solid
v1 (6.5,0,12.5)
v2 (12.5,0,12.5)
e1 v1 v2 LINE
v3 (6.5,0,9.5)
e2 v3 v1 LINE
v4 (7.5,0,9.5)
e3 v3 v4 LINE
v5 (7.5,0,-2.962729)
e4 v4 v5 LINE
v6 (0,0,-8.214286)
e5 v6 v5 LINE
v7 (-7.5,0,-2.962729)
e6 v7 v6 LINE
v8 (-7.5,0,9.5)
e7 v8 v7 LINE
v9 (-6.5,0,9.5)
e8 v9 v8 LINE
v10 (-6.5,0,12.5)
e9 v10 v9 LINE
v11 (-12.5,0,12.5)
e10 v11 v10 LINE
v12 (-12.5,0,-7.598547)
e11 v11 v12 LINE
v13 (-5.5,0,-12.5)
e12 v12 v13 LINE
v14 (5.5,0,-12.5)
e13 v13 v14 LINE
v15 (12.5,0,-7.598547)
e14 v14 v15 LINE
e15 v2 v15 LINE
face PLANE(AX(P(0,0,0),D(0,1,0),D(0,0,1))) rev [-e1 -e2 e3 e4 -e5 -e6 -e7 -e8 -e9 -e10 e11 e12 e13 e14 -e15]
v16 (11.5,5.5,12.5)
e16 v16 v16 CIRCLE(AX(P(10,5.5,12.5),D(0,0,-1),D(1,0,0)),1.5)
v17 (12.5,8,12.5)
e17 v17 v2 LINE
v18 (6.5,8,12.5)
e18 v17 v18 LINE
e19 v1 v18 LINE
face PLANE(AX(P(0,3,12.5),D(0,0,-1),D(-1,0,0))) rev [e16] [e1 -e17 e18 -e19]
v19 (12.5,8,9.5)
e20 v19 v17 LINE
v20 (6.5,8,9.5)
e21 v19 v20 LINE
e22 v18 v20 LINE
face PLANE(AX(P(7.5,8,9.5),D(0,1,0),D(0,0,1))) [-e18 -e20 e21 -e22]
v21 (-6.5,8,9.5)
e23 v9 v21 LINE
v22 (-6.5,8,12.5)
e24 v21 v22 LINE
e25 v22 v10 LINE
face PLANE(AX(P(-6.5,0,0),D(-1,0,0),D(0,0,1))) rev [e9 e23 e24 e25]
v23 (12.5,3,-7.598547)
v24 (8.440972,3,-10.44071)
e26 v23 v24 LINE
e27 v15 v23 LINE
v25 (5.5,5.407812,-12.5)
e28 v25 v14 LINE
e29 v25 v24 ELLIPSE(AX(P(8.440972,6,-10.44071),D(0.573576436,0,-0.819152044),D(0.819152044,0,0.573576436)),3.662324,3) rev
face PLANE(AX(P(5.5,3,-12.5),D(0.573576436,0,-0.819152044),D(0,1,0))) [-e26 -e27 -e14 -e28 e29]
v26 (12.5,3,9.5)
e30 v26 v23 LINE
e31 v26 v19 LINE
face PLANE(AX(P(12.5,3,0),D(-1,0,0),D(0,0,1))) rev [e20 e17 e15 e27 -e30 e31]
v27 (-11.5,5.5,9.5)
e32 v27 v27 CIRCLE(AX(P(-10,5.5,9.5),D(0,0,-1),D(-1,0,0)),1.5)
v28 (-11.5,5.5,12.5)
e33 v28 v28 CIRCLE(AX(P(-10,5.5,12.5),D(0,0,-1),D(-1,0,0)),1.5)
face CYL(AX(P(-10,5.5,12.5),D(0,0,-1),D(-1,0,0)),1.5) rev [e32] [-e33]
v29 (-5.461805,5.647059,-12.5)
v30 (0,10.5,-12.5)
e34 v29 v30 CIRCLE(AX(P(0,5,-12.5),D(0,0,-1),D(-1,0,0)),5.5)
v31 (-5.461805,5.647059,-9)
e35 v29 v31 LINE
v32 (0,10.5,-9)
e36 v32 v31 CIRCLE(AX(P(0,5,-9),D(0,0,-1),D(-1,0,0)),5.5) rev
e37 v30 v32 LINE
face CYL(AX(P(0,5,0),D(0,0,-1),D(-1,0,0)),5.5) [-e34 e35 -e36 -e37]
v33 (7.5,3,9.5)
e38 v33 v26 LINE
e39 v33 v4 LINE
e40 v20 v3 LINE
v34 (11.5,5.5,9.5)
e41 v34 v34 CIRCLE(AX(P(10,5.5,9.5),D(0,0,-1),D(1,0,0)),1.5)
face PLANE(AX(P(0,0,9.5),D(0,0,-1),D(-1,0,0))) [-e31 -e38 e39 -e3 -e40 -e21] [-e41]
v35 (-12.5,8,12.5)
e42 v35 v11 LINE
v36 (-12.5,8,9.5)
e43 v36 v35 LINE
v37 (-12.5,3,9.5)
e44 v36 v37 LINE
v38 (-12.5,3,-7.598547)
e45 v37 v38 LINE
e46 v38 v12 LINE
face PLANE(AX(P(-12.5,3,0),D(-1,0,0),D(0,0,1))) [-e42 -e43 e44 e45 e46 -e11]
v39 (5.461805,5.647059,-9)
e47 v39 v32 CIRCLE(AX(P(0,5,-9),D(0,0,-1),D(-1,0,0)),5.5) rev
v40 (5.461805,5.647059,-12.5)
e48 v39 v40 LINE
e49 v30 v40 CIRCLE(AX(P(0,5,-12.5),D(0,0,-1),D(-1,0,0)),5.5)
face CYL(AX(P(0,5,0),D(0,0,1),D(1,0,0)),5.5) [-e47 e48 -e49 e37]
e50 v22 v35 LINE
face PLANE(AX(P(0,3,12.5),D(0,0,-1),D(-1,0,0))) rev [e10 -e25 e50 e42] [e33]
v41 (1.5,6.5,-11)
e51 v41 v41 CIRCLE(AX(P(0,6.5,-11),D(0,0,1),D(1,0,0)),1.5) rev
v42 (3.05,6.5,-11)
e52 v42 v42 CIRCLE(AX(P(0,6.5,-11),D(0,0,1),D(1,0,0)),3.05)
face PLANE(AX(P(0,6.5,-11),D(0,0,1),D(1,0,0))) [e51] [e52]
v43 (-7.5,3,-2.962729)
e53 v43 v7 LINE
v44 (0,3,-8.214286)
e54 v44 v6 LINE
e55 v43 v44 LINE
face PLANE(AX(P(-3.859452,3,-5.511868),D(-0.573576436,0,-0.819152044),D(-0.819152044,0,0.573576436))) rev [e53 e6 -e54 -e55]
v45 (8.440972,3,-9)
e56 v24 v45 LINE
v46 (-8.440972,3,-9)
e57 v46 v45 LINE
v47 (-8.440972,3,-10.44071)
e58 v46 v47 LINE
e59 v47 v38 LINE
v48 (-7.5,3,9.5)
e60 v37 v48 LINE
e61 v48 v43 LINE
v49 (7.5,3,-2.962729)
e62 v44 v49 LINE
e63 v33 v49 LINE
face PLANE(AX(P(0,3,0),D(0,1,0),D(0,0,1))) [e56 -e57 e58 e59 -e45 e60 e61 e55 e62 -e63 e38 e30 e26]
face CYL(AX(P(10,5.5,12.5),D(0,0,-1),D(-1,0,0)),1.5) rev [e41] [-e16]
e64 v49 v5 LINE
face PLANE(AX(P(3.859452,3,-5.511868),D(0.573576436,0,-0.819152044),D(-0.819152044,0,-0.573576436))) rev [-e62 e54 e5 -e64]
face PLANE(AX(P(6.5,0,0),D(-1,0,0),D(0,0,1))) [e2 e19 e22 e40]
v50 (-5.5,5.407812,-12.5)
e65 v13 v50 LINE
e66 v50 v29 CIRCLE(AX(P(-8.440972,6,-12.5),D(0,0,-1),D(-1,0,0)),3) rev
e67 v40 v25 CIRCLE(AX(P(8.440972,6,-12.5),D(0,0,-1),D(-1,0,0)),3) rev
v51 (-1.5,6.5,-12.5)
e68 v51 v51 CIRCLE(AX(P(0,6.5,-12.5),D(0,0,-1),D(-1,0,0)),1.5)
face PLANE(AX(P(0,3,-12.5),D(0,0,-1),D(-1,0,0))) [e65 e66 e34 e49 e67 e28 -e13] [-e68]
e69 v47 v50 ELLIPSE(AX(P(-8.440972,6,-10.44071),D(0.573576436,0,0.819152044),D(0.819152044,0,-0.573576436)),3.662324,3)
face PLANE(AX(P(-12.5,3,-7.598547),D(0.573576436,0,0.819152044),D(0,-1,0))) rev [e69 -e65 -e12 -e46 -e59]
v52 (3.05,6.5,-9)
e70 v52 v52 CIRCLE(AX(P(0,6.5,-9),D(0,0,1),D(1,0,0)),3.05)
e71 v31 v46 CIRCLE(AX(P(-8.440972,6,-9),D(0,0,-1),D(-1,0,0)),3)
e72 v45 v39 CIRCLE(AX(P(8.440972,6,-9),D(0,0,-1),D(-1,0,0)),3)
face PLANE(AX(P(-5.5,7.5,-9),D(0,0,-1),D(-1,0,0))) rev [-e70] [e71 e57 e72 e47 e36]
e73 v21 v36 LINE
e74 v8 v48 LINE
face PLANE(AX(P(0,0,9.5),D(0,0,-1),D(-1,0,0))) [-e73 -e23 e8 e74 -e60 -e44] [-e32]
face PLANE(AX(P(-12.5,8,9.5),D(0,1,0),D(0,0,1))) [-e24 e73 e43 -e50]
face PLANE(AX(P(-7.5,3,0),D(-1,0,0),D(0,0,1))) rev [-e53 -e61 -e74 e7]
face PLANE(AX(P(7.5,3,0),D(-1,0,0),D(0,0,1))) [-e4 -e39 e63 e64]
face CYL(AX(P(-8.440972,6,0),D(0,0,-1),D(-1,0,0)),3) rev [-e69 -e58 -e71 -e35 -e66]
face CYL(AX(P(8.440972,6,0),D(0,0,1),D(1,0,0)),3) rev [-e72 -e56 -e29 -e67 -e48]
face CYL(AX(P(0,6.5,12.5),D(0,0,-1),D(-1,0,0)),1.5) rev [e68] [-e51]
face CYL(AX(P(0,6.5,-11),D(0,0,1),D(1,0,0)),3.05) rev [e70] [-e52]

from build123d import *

# Parameters (mm, degrees)
BOSS_EXTRUDE1_DEPTH = 3
SKETCH2_W           = 5
SKETCH2_H           = 5
BOSS_EXTRUDE2_DEPTH = 3
SKETCH3_W           = 5
SKETCH3_H           = 5
BOSS_EXTRUDE4_DEPTH = 3
SKETCH4_R           = 1.5
CUT_EXTRUDE1_DEPTH  = 27.537709019
CHAMFER1_SIZE       = 7
CHAMFER1_SIZE2      = 4.901452767
CHAMFER2_SIZE       = 7
CHAMFER2_SIZE2      = 4.901452767
SKETCH6_W           = 11
SKETCH6_H           = 3.5
BOSS_EXTRUDE5_DEPTH = 4.5
SKETCH9_W           = 11
SKETCH9_H           = 3.5
BOSS_EXTRUDE6_DEPTH = 3
FILLET1_R           = 5.5
FILLET2_R           = 3
SKETCH16_R          = 1.5
CUT_EXTRUDE7_DEPTH  = 30.857997254
SKETCH17_R          = 3.05
CUT_EXTRUDE8_DEPTH  = 2
SKETCH18_W          = 3
SKETCH18_H          = 8
BOSS_EXTRUDE7_DEPTH = 1
SKETCH19_W          = 3
SKETCH19_H          = 8
BOSS_EXTRUDE8_DEPTH = 1


# Some blends are built 0.0001 mm under size
with BuildPart() as part:
    # Sketch1 → Boss-Extrude1 (new body)
    with BuildSketch(Plane(origin=(0, 0, 0), x_dir=(1, 0, 0), z_dir=(0, 1, 0))):
        Polygon((-7.5, -12.5), (-7.5, 2.962729178), (0, 8.214285714), (7.5, 2.962729178), (7.5, -12.5), (12.5, -12.5), (12.5, 12.5), (-12.5, 12.5), (-12.5, -12.5), align=None)
    extrude(amount=BOSS_EXTRUDE1_DEPTH)

    # Sketch2 → Boss-Extrude2 (add)
    with BuildSketch(Plane.XY.offset(12.5)):
        with Locations((-10, 5.5)):
            Rectangle(SKETCH2_W, SKETCH2_H)
    extrude(amount=-BOSS_EXTRUDE2_DEPTH)

    # Sketch3 → Boss-Extrude4 (add)
    with BuildSketch(Plane.XY.offset(12.5)):
        with Locations((10, 5.5)):
            Rectangle(SKETCH3_W, SKETCH3_H)
    extrude(amount=-BOSS_EXTRUDE4_DEPTH)

    # Sketch4 → Cut-Extrude1 (cut, through all)
    with BuildSketch(Plane(origin=(0, 0, 9.5), x_dir=(-1, 0, 0), z_dir=(0, 0, -1))):
        with Locations((10, 5.5)):
            Circle(SKETCH4_R)
        with Locations(Location((-10, 5.5, 0), (0, 0, 180))):
            Circle(SKETCH4_R)
    extrude(amount=-CUT_EXTRUDE1_DEPTH, mode=Mode.SUBTRACT)

    # Chamfer1
    chamfer1_edges = [part.edges().sort_by_distance(p)[0] for p in [
        (-12.5, 1.5, -12.5),
    ]]
    chamfer1_side = [part.faces().sort_by_distance(p)[0] for p in [
        (0, 1.5, -12.5),
    ]]
    chamfer(chamfer1_edges, length=CHAMFER1_SIZE, length2=CHAMFER1_SIZE2, reference=chamfer1_side[0])

    # Chamfer2
    chamfer2_edges = [part.edges().sort_by_distance(p)[0] for p in [
        (12.5, 1.5, -12.5),
    ]]
    chamfer2_side = [part.faces().sort_by_distance(p)[0] for p in [
        (3.5, 1.5, -12.5),
    ]]
    chamfer(chamfer2_edges, length=CHAMFER2_SIZE, length2=CHAMFER2_SIZE2, reference=chamfer2_side[0])

    # Sketch6 → Boss-Extrude5 (add)
    with BuildSketch(Plane(origin=(0, 3, 0), x_dir=(1, 0, 0), z_dir=(0, 1, 0))):
        with Locations((0, 10.75)):
            Rectangle(SKETCH6_W, SKETCH6_H)
    extrude(amount=BOSS_EXTRUDE5_DEPTH)

    # Sketch9 → Boss-Extrude6 (add)
    with BuildSketch(Plane(origin=(0, 7.5, 0), x_dir=(1, 0, 0), z_dir=(0, 1, 0))):
        with Locations((0, 10.75)):
            Rectangle(SKETCH9_W, SKETCH9_H)
    extrude(amount=BOSS_EXTRUDE6_DEPTH)

    # Fillet1
    fillet1_edges = [part.edges().sort_by_distance(p)[0] for p in [
        (5.5, 10.5, -10.75),
        (-5.5, 10.5, -10.75),
    ]]
    fillet(fillet1_edges, radius=FILLET1_R - 0.0001)  # a hair under: the kernel refuses the full size

    # Fillet2
    # the kernel refuses this fillet: 3 mm, written as the material it adds along each edge
    with BuildSketch(Plane(origin=(-5.5, 3, -9), x_dir=(-1, 0, 0), z_dir=(0, 0, -1))) as fillet2_piece_1_section:
        with BuildLine():
            CenterArc((2.940982655, 3), FILLET2_R, 186.755728099, 83.244271901)
            Line((-0.038187449, 2.647089966), (-0.336104459, 2.611798962))
            ThreePointArc((-0.336104459, 2.611798962), (-0.3, 2.0001), (-0.3, 0))
            Line((-0.3, 0), (0, -0.3))
            Line((0, -0.3), (2.940982655, -0.3))
            Line((2.940982655, -0.3), (2.940982655, 0))
        make_face()
    fillet2_piece_1 = extrude(amount=3.5, mode=Mode.PRIVATE)
    fillet2_piece_1 = split(fillet2_piece_1, bisect_by=Plane(origin=(-8.304245999, 3.032166693, -10.536445813), z_dir=(0.5735764363510474, 0, 0.8191520442889909)), keep=Keep.TOP, mode=Mode.PRIVATE)
    add(fillet2_piece_1)
    with BuildSketch(Plane(origin=(5.5, 3, -12.5), x_dir=(-0.014424698824614252, 0.9998959586196051, 0), z_dir=(0, 0, 1))) as fillet2_piece_2_section:
        with BuildLine():
            CenterArc((2.957265087, -2.983950768), FILLET2_R, 95.929225072, 83.244271901)
            Line((-0.042422789, -2.940676671), (-0.342391577, -2.936349262))
            Line((-0.342391577, -2.936349262), (-0.299968788, 0.00432741))
            Line((-0.299968788, 0.00432741), (0.00432741, 0.299968788))
            ThreePointArc((0.00432741, 0.299968788), (2.004219316, 0.271117947), (2.616375433, 0.298395077))
            Line((2.616375433, 0.298395077), (2.647365401, 0))
        make_face()
    fillet2_piece_2 = extrude(amount=3.5, mode=Mode.PRIVATE)
    fillet2_piece_2 = split(fillet2_piece_2, bisect_by=Plane(origin=(6.733396297, 4.098580715, -11.636366615), z_dir=(-0.5735764363510474, 0, 0.8191520442889909)), keep=Keep.TOP, mode=Mode.PRIVATE)
    add(fillet2_piece_2)

    # Sketch16 → Cut-Extrude7 (cut, through all)
    with BuildSketch(Plane(origin=(0, 0, -12.5), x_dir=(-1, 0, 0), z_dir=(0, 0, -1))):
        with Locations((0, 6.5)):
            Circle(SKETCH16_R)
    extrude(amount=-CUT_EXTRUDE7_DEPTH, mode=Mode.SUBTRACT)

    # Sketch17 → Cut-Extrude8 (cut)
    with BuildSketch(Plane.XY.offset(-9)):
        with Locations((0, 6.5)):
            Circle(SKETCH17_R)
    extrude(amount=-CUT_EXTRUDE8_DEPTH, mode=Mode.SUBTRACT)

    # Sketch18 → Boss-Extrude7 (add)
    with BuildSketch(Plane.ZY.offset(-7.5)):
        with Locations((11, 4)):
            Rectangle(SKETCH18_W, SKETCH18_H)
    extrude(amount=BOSS_EXTRUDE7_DEPTH)

    # Sketch19 → Boss-Extrude8 (add)
    with BuildSketch(Plane(origin=(-7.5, 0, 0), x_dir=(0, 0, -1), z_dir=(1, 0, 0))):
        with Locations((-11, 4)):
            Rectangle(SKETCH19_W, SKETCH19_H)
    extrude(amount=BOSS_EXTRUDE8_DEPTH)


solid = part.part
